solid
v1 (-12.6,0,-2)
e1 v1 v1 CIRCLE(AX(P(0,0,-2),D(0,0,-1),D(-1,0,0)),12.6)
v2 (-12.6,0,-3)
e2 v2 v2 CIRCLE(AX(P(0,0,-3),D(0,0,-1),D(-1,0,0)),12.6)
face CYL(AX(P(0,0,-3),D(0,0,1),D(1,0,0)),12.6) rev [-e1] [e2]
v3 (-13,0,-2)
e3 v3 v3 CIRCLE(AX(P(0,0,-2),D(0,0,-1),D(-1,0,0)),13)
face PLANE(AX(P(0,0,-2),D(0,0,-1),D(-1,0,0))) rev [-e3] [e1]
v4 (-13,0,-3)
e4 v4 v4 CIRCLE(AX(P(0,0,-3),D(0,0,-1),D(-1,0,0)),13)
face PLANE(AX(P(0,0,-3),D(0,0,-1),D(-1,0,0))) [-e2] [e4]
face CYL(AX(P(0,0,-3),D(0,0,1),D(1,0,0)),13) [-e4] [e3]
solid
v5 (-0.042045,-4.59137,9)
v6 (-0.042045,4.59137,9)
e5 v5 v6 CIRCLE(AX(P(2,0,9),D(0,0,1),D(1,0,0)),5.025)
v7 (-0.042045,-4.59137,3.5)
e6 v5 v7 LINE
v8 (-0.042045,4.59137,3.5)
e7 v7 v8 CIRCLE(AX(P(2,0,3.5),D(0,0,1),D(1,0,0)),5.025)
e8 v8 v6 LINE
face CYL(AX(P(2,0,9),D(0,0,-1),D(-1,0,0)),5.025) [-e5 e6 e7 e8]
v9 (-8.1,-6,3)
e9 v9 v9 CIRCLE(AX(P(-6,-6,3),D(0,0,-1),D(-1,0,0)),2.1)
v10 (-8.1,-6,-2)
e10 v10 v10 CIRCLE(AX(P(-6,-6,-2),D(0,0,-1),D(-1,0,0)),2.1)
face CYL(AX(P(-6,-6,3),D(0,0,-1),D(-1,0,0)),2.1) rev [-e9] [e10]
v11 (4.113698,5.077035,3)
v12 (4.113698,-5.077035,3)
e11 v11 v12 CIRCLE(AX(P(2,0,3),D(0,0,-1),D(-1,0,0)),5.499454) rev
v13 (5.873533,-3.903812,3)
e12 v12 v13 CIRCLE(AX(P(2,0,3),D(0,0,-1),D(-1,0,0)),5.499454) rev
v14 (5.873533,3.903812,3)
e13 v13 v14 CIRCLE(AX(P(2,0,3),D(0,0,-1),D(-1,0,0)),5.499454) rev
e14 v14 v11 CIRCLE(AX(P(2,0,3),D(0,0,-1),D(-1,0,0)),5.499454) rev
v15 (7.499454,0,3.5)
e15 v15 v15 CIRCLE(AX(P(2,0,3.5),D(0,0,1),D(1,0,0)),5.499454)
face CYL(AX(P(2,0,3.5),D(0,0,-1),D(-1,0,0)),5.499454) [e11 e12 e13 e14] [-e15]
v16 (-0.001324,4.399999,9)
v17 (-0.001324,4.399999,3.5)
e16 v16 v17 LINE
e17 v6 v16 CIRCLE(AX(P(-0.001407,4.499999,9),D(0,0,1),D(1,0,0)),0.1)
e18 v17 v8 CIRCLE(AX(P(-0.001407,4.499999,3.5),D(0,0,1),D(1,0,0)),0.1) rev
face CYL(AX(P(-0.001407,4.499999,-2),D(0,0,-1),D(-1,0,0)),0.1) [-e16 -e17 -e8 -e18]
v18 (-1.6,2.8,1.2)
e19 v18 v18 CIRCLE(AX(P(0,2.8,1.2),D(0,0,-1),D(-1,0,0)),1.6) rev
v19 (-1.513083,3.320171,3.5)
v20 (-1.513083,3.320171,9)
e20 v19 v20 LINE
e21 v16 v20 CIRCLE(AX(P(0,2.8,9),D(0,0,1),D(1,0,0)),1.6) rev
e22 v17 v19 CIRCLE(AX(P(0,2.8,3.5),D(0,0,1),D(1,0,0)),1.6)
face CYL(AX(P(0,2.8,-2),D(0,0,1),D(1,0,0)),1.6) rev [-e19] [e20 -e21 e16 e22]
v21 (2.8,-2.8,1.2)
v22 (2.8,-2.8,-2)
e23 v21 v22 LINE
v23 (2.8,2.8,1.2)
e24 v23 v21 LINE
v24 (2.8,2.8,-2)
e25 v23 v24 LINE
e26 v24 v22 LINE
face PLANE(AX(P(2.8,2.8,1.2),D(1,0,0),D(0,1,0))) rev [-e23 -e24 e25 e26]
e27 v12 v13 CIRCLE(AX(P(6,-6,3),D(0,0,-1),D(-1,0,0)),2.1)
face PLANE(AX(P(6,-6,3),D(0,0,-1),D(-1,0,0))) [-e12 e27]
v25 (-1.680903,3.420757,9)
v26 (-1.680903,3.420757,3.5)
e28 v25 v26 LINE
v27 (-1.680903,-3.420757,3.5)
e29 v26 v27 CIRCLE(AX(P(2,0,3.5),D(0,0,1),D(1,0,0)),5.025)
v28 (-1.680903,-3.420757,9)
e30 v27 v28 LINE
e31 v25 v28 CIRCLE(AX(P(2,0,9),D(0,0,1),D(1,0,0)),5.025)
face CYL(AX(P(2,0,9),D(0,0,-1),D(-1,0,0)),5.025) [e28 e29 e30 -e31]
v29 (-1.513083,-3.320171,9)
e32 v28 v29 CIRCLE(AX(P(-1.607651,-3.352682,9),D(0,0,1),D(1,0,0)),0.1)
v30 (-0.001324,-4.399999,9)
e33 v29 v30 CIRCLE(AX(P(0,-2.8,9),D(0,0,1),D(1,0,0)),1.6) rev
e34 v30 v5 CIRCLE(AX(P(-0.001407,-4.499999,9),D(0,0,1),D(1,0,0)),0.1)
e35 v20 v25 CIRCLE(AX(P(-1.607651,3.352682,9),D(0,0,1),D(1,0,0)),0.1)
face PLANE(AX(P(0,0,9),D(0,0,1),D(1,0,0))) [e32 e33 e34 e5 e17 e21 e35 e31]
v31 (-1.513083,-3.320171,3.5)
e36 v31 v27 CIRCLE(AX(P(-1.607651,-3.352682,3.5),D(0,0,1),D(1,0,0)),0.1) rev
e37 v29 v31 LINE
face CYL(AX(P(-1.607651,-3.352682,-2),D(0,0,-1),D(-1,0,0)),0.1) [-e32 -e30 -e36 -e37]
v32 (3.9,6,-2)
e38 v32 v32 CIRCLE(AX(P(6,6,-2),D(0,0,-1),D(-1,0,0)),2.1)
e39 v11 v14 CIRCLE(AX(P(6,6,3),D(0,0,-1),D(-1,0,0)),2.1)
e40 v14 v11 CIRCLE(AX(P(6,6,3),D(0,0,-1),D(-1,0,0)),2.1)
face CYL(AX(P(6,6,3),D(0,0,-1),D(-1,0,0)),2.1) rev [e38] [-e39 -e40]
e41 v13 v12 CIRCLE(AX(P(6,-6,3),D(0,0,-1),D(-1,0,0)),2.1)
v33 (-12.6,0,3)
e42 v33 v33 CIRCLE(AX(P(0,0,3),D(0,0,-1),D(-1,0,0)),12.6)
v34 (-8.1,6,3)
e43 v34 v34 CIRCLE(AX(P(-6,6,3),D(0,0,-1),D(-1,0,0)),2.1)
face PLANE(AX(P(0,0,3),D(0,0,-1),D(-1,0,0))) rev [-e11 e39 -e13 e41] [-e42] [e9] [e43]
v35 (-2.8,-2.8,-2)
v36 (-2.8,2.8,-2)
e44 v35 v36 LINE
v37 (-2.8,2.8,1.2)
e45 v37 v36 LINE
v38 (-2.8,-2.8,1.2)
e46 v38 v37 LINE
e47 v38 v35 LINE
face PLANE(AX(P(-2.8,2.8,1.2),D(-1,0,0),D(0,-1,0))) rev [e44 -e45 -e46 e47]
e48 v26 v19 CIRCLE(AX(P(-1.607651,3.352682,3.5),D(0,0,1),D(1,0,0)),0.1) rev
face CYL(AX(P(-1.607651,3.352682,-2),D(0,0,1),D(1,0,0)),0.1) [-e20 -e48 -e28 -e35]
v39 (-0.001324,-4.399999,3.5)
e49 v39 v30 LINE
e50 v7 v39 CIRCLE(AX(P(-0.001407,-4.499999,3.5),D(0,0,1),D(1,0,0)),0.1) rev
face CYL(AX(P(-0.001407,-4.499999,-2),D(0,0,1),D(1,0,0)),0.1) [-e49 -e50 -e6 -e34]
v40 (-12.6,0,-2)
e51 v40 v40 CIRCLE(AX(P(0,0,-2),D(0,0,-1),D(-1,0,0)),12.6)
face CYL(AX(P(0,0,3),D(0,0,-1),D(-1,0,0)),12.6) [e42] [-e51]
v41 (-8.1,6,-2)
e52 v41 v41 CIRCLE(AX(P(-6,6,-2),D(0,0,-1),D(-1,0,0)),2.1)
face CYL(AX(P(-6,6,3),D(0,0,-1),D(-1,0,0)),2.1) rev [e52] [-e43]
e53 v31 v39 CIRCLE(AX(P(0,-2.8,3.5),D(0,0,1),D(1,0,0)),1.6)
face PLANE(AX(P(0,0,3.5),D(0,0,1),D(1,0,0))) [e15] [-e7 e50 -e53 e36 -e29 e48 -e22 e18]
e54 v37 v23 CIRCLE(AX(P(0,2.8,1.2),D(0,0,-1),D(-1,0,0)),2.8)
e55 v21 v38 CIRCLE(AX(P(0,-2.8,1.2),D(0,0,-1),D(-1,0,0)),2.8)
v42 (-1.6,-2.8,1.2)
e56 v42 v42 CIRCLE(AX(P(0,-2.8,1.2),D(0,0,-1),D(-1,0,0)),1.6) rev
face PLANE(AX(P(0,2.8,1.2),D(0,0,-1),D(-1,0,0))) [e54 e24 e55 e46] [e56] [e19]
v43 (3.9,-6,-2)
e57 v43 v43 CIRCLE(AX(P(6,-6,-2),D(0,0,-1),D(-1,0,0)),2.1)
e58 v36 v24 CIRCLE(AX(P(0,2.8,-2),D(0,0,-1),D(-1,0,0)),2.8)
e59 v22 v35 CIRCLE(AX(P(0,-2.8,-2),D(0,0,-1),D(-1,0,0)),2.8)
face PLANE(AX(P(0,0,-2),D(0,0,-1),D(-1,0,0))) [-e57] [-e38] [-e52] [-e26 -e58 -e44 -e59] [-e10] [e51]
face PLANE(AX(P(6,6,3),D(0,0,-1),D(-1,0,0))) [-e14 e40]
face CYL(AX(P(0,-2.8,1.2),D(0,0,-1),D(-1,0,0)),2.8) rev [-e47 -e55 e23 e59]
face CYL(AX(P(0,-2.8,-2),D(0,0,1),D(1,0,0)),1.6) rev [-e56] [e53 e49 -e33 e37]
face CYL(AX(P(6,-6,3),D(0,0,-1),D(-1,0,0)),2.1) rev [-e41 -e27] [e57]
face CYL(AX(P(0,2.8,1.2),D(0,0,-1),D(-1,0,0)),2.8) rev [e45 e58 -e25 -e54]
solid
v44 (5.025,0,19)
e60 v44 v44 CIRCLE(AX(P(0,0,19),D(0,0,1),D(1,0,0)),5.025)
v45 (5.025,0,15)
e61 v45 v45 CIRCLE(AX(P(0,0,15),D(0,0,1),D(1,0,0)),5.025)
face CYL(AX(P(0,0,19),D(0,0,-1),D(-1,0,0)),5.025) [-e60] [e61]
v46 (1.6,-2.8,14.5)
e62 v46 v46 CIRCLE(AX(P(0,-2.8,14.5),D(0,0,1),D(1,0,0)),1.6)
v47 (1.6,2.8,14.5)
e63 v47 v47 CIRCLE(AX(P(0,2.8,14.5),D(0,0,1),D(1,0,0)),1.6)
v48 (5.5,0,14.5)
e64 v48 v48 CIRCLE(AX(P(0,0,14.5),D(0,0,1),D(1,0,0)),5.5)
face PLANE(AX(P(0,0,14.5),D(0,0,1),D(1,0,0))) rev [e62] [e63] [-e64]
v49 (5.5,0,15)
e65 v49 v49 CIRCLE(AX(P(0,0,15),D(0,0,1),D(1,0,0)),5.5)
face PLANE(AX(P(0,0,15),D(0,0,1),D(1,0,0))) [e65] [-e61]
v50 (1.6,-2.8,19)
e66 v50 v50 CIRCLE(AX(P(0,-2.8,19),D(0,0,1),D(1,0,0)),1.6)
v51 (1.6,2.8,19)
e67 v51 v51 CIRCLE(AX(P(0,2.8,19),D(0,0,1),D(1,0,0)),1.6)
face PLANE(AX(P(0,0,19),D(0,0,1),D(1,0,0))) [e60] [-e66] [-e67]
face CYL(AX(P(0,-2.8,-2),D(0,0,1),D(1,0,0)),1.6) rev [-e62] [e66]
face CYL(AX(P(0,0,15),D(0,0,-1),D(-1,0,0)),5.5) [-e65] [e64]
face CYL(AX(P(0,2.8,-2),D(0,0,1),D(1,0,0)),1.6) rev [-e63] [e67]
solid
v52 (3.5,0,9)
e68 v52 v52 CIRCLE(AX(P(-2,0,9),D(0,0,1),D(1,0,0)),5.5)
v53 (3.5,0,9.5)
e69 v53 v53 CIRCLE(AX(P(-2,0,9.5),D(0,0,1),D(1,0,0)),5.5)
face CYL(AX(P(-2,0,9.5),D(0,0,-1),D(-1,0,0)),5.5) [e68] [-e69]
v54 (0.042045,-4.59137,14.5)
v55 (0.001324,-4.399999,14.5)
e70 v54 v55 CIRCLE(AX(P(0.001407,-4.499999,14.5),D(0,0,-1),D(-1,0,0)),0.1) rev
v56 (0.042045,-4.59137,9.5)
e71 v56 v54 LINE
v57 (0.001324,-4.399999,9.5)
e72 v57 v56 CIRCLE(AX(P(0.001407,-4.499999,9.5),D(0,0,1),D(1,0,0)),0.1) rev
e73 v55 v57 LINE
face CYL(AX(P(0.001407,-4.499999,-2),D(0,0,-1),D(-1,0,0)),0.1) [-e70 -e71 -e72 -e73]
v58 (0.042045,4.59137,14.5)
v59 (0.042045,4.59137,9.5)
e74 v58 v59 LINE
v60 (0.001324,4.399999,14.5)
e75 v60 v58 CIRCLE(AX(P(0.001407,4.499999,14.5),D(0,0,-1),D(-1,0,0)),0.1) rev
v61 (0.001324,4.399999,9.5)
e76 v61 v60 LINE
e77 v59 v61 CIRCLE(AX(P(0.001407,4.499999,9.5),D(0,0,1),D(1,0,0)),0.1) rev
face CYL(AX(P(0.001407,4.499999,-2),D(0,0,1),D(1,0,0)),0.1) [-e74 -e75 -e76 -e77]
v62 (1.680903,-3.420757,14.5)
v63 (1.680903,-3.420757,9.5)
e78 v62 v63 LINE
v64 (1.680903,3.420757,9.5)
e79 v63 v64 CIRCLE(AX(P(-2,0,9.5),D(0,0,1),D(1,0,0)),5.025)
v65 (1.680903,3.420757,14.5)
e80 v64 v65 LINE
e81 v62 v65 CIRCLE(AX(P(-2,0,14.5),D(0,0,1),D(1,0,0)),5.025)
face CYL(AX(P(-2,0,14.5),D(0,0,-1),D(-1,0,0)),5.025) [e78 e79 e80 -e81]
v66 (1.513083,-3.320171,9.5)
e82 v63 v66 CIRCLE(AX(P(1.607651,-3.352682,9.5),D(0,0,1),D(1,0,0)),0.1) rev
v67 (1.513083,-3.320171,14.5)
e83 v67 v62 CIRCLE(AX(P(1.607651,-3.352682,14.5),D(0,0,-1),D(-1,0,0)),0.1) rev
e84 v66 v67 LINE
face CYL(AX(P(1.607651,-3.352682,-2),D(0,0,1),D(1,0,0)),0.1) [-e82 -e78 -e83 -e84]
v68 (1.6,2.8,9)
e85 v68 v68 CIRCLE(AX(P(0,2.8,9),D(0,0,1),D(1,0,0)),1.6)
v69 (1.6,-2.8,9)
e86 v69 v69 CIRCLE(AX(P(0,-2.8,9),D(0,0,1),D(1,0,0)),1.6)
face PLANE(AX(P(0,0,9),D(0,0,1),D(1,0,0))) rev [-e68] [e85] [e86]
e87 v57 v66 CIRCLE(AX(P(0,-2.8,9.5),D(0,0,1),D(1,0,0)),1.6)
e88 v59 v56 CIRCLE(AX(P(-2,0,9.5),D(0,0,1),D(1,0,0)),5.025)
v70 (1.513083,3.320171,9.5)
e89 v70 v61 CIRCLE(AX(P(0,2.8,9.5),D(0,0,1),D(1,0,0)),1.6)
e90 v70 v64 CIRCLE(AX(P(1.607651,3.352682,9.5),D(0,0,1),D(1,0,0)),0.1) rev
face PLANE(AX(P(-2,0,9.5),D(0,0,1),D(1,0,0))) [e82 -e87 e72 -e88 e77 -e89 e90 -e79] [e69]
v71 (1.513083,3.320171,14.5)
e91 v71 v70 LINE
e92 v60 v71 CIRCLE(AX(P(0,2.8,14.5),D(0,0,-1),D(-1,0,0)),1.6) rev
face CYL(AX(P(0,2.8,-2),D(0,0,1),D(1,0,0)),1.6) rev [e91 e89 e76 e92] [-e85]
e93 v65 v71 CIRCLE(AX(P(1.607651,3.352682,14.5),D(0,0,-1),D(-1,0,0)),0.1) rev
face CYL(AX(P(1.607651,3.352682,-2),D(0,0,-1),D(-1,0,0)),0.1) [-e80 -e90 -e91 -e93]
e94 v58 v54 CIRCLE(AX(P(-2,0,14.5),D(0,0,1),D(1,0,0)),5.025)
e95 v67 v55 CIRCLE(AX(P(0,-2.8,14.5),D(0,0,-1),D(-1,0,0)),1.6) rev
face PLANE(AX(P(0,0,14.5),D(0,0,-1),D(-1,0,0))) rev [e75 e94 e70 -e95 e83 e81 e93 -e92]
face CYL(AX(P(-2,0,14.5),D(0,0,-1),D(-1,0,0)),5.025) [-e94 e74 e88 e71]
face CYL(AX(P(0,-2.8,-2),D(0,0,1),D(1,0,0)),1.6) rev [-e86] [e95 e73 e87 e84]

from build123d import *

# Parameters (mm, degrees)
SKETCH1_R               = 12.6
BOSS_EXTRUDE1_DEPTH     = 5
SKETCH2_R               = 5.499454457575955
SKETCH2_R_2             = 5.0249999999999995
BOSS_EXTRUDE2_DEPTH     = 0.5
BOSS_EXTRUDE3_START     = 3
BOSS_EXTRUDE3_OUTLINE_R = 5.025
BOSS_EXTRUDE3_DEPTH     = 6
BOSS_EXTRUDE4_START     = 6
SKETCH3_R               = 5.5
SKETCH3_R_2             = 5.0249999999999995
BOSS_EXTRUDE4_DEPTH     = 0.5
BOSS_EXTRUDE5_START     = 6
SKETCH3_3_R             = 5.0249999999999995
BOSS_EXTRUDE5_DEPTH     = 5.5
BOSS_EXTRUDE6_START     = 11.5
SKETCH4_R               = 5.5
SKETCH4_R_2             = 5.0249999999999995
BOSS_EXTRUDE6_DEPTH     = 0.5
BOSS_EXTRUDE7_START     = 11.5
SKETCH4_7_R             = 5.0249999999999995
BOSS_EXTRUDE7_DEPTH     = 4.5
SKETCH5_R               = 1.6000000000000003
CUT_EXTRUDE1_DEPTH      = 28.541241802068402
SPLIT1_START            = 9
SPLIT1_OUTLINE_R        = 1.6
SPLIT1_DEPTH            = 10
SPLIT1_2_DEPTH          = 5.5
SPLIT1_3_OUTLINE_R      = 5.5
SPLIT1_3_DEPTH          = 0.5
SPLIT1_START_2          = 14.5
SPLIT1_4_OUTLINE_R      = 5.025
SPLIT1_4_OUTLINE_R_2    = 1.6
SPLIT1_4_DEPTH          = 4.5
SPLIT1_5_OUTLINE_R      = 5.5
SPLIT1_5_OUTLINE_R_2    = 5.025
SPLIT1_5_DEPTH          = 0.5
FILLET1_R               = 0.1
FILLET2_R               = 0.1
CUT_EXTRUDE2_DEPTH      = 3.2
SKETCH7_R               = 2.1000000000000005
SKETCH7_R_2             = 2.099999999999999
SKETCH7_R_3             = 2.1000000000000014
CUT_EXTRUDE3_DEPTH      = 5
SKETCH8_R               = 13
SKETCH8_R_2             = 12.600000000000003
BOSS_EXTRUDE8_DEPTH     = 1


# Read off the part's stored shape, not the designer's step: Boss-Extrude3, Split1
with BuildPart() as part:
    # Sketch1 → Boss-Extrude1 (new body)
    with BuildSketch(Plane(origin=(0, 0, -2), x_dir=(-1, 0, 0), z_dir=(0, 0, -1))):
        Circle(SKETCH1_R)
    extrude(amount=-BOSS_EXTRUDE1_DEPTH)

    # Sketch2 → Boss-Extrude2 (add)
    with BuildSketch(Plane.XY.offset(3)):
        with Locations(Location((2, 0, 0), (0, 0, 180))):
            Circle(SKETCH2_R)
        with Locations((2, 0)):
            Circle(SKETCH2_R_2, mode=Mode.SUBTRACT)
    extrude(amount=BOSS_EXTRUDE2_DEPTH)

    # Boss-Extrude3 outline → Boss-Extrude3 (add)
    with BuildSketch(Plane.XY.offset(BOSS_EXTRUDE3_START)):
        with Locations((2, 0)):
            Circle(BOSS_EXTRUDE3_OUTLINE_R)
    extrude(amount=BOSS_EXTRUDE3_DEPTH)



with BuildPart() as body_2:
    # Sketch3 → Boss-Extrude4 (new body)
    with BuildSketch(Plane.XY.offset(3).offset(BOSS_EXTRUDE4_START)):
        with Locations((-2, -2.4e-16)):
            Circle(SKETCH3_R)
        with Locations((-2, -2.4e-16)):
            Circle(SKETCH3_R_2, mode=Mode.SUBTRACT)
    extrude(amount=BOSS_EXTRUDE4_DEPTH)


with BuildPart() as part_1:
    add(part.part)

    add(body_2.part)  # Boss-Extrude5 merges body 2
    # Sketch3<3> → Boss-Extrude5 (add)
    with BuildSketch(Plane.XY.offset(3).offset(BOSS_EXTRUDE5_START)):
        with Locations((-2, -2.4e-16)):
            Circle(SKETCH3_3_R)
    extrude(amount=BOSS_EXTRUDE5_DEPTH)

    # Sketch4 → Boss-Extrude6 (add)
    with BuildSketch(Plane.XY.offset(3).offset(BOSS_EXTRUDE6_START)):
        with Locations(Location((0, 0, 0), (0, 0, 114.145956113))):
            Circle(SKETCH4_R)
        with Locations(Location((0, 0, 0), (0, 0, 101.478778724))):
            Circle(SKETCH4_R_2, mode=Mode.SUBTRACT)
    extrude(amount=BOSS_EXTRUDE6_DEPTH)

    # Sketch4<7> → Boss-Extrude7 (add)
    with BuildSketch(Plane.XY.offset(3).offset(BOSS_EXTRUDE7_START)):
        Circle(SKETCH4_7_R)
    extrude(amount=BOSS_EXTRUDE7_DEPTH)

    # Sketch5 → Cut-Extrude1 (cut, through all)
    with BuildSketch(Plane.XY.offset(19)):
        with Locations((2e-17, 2.8)):
            Circle(SKETCH5_R)
        with Locations((7.1e-16, -2.8)):
            Circle(SKETCH5_R)
    extrude(amount=-CUT_EXTRUDE1_DEPTH, mode=Mode.SUBTRACT)

    # Split1 outline → Split1 (cut)
    with BuildSketch(Plane.XY.offset(SPLIT1_START)):
        with BuildLine():
            ThreePointArc((-1, 5.408326913), (-7.5, 0), (-1, -5.408326913))
            ThreePointArc((-1, -5.408326913), (5.5, 0), (-1, 5.408326913))
        make_face()
        with Locations((0, 2.8)):
            Circle(SPLIT1_OUTLINE_R, mode=Mode.SUBTRACT)
        with Locations((0, -2.8)):
            Circle(SPLIT1_OUTLINE_R, mode=Mode.SUBTRACT)
    extrude(amount=SPLIT1_DEPTH, mode=Mode.SUBTRACT)

    # Fillet2
    fillet2_edges = [part_1.edges().sort_by_distance(p)[0] for p in [
        (-0.6950501563685023, -4.241147209736785, 6.25),
        (-1.1378256882260929, -3.9248789726956494, 6.25),
        (-1.1378256882260933, 3.9248789726956486, 6.25),
        (-0.6950501563685028, 4.241147209736784, 6.25),
    ]]
    fillet(fillet2_edges, radius=FILLET2_R)

    # Sketch6 → Cut-Extrude2 (cut)
    with BuildSketch(Plane(origin=(0, 0, -2), x_dir=(-1, 0, 0), z_dir=(0, 0, -1))):
        with BuildLine():
            Line((2.8, 2.8), (2.799999999999999, -2.8))
            ThreePointArc((2.799999999999999, -2.8), (-1.22e-15, -5.6), (-2.8000000000000007, -2.8))
            Line((-2.8000000000000007, -2.8), (-2.8, 2.8))
            ThreePointArc((-2.8, 2.8), (1.5e-16, 5.6), (2.8, 2.8))
        make_face()
    extrude(amount=-CUT_EXTRUDE2_DEPTH, mode=Mode.SUBTRACT)

    # Sketch7 → Cut-Extrude3 (cut)
    with BuildSketch(Plane(origin=(0, 0, -2), x_dir=(-1, 0, 0), z_dir=(0, 0, -1))):
        with Locations((-6.000000000000002, 5.999999999999999)):
            Circle(SKETCH7_R)
        with Locations((5.999999999999998, 5.999999999999999)):
            Circle(SKETCH7_R)
        with Locations((5.999999999999998, -6.000000000000001)):
            Circle(SKETCH7_R_2)
        with Locations((-6.000000000000003, -6)):
            Circle(SKETCH7_R_3)
    extrude(amount=-CUT_EXTRUDE3_DEPTH, mode=Mode.SUBTRACT)


with BuildPart() as body_2_2:
    # Split1 2 outline → Split1 2 (new body)
    with BuildSketch(Plane.XY.offset(SPLIT1_START)):
        with BuildLine():
            ThreePointArc((1.137825688, -3.924878973), (3.025, 0), (1.137825688, 3.924878973))
            ThreePointArc((1.137825688, 3.924878973), (-0.92998111, 1.498026446), (0.695050156, 4.24114721))
            ThreePointArc((0.695050156, 4.24114721), (-7.025, 0), (0.695050156, -4.24114721))
            ThreePointArc((0.695050156, -4.24114721), (-0.92998111, -1.498026446), (1.137825688, -3.924878973))
        make_face()
    extrude(amount=SPLIT1_2_DEPTH)

    # Split1 3 outline → Split1 3 (add)
    with BuildSketch(Plane.XY.offset(SPLIT1_START)):
        with Locations((-2, 0)):
            Circle(SPLIT1_3_OUTLINE_R)
        with BuildLine():
            ThreePointArc((0.695050156, 4.24114721), (0.92998111, 4.101973554), (1.137825688, 3.924878973))
            ThreePointArc((1.137825688, 3.924878973), (3.025, 0), (1.137825688, -3.924878973))
            ThreePointArc((1.137825688, -3.924878973), (0.92998111, -4.101973554), (0.695050156, -4.24114721))
            ThreePointArc((0.695050156, -4.24114721), (-7.025, 0), (0.695050156, 4.24114721))
        make_face(mode=Mode.SUBTRACT)
    extrude(amount=SPLIT1_3_DEPTH)

    # Fillet1
    # the kernel refuses this fillet: 0.1 mm, written as the material it takes off along each edge
    with BuildSketch(Plane(origin=(1.1378256880000006, -3.924878973, 9.5), x_dir=(0.5272838464707954, 0.8496892050926401, 0), z_dir=(0, 0, 1))) as fillet1_piece_1:
        with BuildLine():
            CenterArc((0.7339208558356513, -0.09749554475196075), FILLET1_R, 102.8500510005881, 156.06997269077794)
            Line((0.7147029545095785, -0.19563153340353207), (0.7143185964830571, -0.19759425317656348))
            ThreePointArc((0.7143185964830571, -0.19759425317656348), (0.3532125240431902, -0.1129366525704308), (-0.00066881691387395, -0.00188485647615828))
            Line((-0.00066881691387395, -0.00188485647615828), (0.00044480051866812, 0.00194991089503923))
            ThreePointArc((0.00044480051866812, 0.00194991089503923), (0.35584041495112406, -0.03807128397050696), (0.7112360293835808, 0.00194991089503922))
            Line((0.7112360293835808, 0.00194991089503922), (0.7116808299022489, -4e-17))
        make_face()
    extrude(amount=5, mode=Mode.SUBTRACT)
    with BuildSketch(Plane(origin=(0.6950501559999995, -4.241147210000001, 9.5), x_dir=(-0.9747710361649122, -0.22320713934366773, 0), z_dir=(0, 0, 1))) as fillet1_piece_2:
        with BuildLine():
            CenterArc((0.7339208553218103, 0.09749554475551281), FILLET1_R, 101.07997632228573, 156.06997268627677)
            Line((0.714702953972355, 0.19563153340250483), (0.7143185959453658, 0.1975942531754444))
            ThreePointArc((0.7143185959453658, 0.1975942531754444), (0.35321252377659246, 0.11293665255128191), (-0.00066881691414123, 0.00188485647606383))
            Line((-0.00066881691414123, 0.00188485647606383), (0.00044480051835665, -0.00194991089511022))
            ThreePointArc((0.00044480051835665, -0.00194991089511022), (0.35584041470198946, 0.03807128391367618), (0.711236028885622, -0.00194991089511051))
            Line((0.711236028885622, -0.00194991089511051), (0.7116808294039787, 0))
        make_face()
    extrude(amount=5, mode=Mode.SUBTRACT)
    with BuildSketch(Plane(origin=(0.6950501560000002, 4.24114721, 9.5), x_dir=(-0.8812560463152725, 0.4726391655721877, 0), z_dir=(0, 0, 1))) as fillet1_piece_3:
        with BuildLine():
            CenterArc((0.7336208593975166, 0.09972781848774585), FILLET1_R, 118.15832442623193, 156.06997268627686)
            Line((0.6864298993019216, 0.18789251258496353), (0.6854860801000094, 0.1896558064669081))
            ThreePointArc((0.6854860801000094, 0.1896558064669081), (0.35326623794808576, 0.05722576797323723), (-8.578182782469e-05, 0.00199815952266453))
            Line((-8.578182782469e-05, 0.00199815952266453), (-0.00014746147927519, -0.00199455636975523))
            ThreePointArc((-0.00014746147927519, -0.00199455636975523), (0.37049696668064286, -0.01567712099081798), (0.7411413948405625, -0.00199455636975463))
            Line((0.7411413948405625, -0.00199455636975463), (0.7409939333612872, 0))
        make_face()
    extrude(amount=5, mode=Mode.SUBTRACT)
    with BuildSketch(Plane(origin=(1.1378256880000008, 3.924878973, 9.5), x_dir=(0.7329038743989365, -0.6803322062720741, 0), z_dir=(0, 0, 1))) as fillet1_piece_4:
        with BuildLine():
            CenterArc((0.7336208599111411, -0.09972781848739057), FILLET1_R, 85.77170288473079, 156.06997269077783)
            Line((0.6864298998182243, -0.1878925125860417), (0.6854860806163661, -0.18965580646801475))
            ThreePointArc((0.6854860806163661, -0.18965580646801475), (0.35326623821426095, -0.05722576791705115), (-8.578182712573e-05, -0.00199815952269459))
            Line((-8.578182712573e-05, -0.00199815952269459), (-0.00014746147937158, 0.00199455636974773))
            ThreePointArc((-0.00014746147937158, 0.00199455636974773), (0.3704969669398584, 0.01567712100932383), (0.7411413953590879, 0.00199455636974782))
            Line((0.7411413953590879, 0.00199455636974782), (0.7409939338797163, 3e-17))
        make_face()
    extrude(amount=5, mode=Mode.SUBTRACT)


with BuildPart() as body_3:
    # Split1 4 outline → Split1 4 (new body)
    with BuildSketch(Plane.XY.offset(SPLIT1_START_2)):
        Circle(SPLIT1_4_OUTLINE_R)
        with Locations((0, -2.8)):
            Circle(SPLIT1_4_OUTLINE_R_2, mode=Mode.SUBTRACT)
        with Locations((0, 2.8)):
            Circle(SPLIT1_4_OUTLINE_R_2, mode=Mode.SUBTRACT)
    extrude(amount=SPLIT1_4_DEPTH)

    # Split1 5 outline → Split1 5 (add)
    with BuildSketch(Plane.XY.offset(SPLIT1_START_2)):
        Circle(SPLIT1_5_OUTLINE_R)
        Circle(SPLIT1_5_OUTLINE_R_2, mode=Mode.SUBTRACT)
    extrude(amount=SPLIT1_5_DEPTH)


with BuildPart() as body_4:
    # Sketch8 → Boss-Extrude8 (new body)
    with BuildSketch(Plane(origin=(0, 0, -2), x_dir=(-1, 0, 0), z_dir=(0, 0, -1))):
        Circle(SKETCH8_R)
        Circle(SKETCH8_R_2, mode=Mode.SUBTRACT)
    extrude(amount=BOSS_EXTRUDE8_DEPTH)


solid = Compound([part_1.part, body_2_2.part, body_3.part, body_4.part])
